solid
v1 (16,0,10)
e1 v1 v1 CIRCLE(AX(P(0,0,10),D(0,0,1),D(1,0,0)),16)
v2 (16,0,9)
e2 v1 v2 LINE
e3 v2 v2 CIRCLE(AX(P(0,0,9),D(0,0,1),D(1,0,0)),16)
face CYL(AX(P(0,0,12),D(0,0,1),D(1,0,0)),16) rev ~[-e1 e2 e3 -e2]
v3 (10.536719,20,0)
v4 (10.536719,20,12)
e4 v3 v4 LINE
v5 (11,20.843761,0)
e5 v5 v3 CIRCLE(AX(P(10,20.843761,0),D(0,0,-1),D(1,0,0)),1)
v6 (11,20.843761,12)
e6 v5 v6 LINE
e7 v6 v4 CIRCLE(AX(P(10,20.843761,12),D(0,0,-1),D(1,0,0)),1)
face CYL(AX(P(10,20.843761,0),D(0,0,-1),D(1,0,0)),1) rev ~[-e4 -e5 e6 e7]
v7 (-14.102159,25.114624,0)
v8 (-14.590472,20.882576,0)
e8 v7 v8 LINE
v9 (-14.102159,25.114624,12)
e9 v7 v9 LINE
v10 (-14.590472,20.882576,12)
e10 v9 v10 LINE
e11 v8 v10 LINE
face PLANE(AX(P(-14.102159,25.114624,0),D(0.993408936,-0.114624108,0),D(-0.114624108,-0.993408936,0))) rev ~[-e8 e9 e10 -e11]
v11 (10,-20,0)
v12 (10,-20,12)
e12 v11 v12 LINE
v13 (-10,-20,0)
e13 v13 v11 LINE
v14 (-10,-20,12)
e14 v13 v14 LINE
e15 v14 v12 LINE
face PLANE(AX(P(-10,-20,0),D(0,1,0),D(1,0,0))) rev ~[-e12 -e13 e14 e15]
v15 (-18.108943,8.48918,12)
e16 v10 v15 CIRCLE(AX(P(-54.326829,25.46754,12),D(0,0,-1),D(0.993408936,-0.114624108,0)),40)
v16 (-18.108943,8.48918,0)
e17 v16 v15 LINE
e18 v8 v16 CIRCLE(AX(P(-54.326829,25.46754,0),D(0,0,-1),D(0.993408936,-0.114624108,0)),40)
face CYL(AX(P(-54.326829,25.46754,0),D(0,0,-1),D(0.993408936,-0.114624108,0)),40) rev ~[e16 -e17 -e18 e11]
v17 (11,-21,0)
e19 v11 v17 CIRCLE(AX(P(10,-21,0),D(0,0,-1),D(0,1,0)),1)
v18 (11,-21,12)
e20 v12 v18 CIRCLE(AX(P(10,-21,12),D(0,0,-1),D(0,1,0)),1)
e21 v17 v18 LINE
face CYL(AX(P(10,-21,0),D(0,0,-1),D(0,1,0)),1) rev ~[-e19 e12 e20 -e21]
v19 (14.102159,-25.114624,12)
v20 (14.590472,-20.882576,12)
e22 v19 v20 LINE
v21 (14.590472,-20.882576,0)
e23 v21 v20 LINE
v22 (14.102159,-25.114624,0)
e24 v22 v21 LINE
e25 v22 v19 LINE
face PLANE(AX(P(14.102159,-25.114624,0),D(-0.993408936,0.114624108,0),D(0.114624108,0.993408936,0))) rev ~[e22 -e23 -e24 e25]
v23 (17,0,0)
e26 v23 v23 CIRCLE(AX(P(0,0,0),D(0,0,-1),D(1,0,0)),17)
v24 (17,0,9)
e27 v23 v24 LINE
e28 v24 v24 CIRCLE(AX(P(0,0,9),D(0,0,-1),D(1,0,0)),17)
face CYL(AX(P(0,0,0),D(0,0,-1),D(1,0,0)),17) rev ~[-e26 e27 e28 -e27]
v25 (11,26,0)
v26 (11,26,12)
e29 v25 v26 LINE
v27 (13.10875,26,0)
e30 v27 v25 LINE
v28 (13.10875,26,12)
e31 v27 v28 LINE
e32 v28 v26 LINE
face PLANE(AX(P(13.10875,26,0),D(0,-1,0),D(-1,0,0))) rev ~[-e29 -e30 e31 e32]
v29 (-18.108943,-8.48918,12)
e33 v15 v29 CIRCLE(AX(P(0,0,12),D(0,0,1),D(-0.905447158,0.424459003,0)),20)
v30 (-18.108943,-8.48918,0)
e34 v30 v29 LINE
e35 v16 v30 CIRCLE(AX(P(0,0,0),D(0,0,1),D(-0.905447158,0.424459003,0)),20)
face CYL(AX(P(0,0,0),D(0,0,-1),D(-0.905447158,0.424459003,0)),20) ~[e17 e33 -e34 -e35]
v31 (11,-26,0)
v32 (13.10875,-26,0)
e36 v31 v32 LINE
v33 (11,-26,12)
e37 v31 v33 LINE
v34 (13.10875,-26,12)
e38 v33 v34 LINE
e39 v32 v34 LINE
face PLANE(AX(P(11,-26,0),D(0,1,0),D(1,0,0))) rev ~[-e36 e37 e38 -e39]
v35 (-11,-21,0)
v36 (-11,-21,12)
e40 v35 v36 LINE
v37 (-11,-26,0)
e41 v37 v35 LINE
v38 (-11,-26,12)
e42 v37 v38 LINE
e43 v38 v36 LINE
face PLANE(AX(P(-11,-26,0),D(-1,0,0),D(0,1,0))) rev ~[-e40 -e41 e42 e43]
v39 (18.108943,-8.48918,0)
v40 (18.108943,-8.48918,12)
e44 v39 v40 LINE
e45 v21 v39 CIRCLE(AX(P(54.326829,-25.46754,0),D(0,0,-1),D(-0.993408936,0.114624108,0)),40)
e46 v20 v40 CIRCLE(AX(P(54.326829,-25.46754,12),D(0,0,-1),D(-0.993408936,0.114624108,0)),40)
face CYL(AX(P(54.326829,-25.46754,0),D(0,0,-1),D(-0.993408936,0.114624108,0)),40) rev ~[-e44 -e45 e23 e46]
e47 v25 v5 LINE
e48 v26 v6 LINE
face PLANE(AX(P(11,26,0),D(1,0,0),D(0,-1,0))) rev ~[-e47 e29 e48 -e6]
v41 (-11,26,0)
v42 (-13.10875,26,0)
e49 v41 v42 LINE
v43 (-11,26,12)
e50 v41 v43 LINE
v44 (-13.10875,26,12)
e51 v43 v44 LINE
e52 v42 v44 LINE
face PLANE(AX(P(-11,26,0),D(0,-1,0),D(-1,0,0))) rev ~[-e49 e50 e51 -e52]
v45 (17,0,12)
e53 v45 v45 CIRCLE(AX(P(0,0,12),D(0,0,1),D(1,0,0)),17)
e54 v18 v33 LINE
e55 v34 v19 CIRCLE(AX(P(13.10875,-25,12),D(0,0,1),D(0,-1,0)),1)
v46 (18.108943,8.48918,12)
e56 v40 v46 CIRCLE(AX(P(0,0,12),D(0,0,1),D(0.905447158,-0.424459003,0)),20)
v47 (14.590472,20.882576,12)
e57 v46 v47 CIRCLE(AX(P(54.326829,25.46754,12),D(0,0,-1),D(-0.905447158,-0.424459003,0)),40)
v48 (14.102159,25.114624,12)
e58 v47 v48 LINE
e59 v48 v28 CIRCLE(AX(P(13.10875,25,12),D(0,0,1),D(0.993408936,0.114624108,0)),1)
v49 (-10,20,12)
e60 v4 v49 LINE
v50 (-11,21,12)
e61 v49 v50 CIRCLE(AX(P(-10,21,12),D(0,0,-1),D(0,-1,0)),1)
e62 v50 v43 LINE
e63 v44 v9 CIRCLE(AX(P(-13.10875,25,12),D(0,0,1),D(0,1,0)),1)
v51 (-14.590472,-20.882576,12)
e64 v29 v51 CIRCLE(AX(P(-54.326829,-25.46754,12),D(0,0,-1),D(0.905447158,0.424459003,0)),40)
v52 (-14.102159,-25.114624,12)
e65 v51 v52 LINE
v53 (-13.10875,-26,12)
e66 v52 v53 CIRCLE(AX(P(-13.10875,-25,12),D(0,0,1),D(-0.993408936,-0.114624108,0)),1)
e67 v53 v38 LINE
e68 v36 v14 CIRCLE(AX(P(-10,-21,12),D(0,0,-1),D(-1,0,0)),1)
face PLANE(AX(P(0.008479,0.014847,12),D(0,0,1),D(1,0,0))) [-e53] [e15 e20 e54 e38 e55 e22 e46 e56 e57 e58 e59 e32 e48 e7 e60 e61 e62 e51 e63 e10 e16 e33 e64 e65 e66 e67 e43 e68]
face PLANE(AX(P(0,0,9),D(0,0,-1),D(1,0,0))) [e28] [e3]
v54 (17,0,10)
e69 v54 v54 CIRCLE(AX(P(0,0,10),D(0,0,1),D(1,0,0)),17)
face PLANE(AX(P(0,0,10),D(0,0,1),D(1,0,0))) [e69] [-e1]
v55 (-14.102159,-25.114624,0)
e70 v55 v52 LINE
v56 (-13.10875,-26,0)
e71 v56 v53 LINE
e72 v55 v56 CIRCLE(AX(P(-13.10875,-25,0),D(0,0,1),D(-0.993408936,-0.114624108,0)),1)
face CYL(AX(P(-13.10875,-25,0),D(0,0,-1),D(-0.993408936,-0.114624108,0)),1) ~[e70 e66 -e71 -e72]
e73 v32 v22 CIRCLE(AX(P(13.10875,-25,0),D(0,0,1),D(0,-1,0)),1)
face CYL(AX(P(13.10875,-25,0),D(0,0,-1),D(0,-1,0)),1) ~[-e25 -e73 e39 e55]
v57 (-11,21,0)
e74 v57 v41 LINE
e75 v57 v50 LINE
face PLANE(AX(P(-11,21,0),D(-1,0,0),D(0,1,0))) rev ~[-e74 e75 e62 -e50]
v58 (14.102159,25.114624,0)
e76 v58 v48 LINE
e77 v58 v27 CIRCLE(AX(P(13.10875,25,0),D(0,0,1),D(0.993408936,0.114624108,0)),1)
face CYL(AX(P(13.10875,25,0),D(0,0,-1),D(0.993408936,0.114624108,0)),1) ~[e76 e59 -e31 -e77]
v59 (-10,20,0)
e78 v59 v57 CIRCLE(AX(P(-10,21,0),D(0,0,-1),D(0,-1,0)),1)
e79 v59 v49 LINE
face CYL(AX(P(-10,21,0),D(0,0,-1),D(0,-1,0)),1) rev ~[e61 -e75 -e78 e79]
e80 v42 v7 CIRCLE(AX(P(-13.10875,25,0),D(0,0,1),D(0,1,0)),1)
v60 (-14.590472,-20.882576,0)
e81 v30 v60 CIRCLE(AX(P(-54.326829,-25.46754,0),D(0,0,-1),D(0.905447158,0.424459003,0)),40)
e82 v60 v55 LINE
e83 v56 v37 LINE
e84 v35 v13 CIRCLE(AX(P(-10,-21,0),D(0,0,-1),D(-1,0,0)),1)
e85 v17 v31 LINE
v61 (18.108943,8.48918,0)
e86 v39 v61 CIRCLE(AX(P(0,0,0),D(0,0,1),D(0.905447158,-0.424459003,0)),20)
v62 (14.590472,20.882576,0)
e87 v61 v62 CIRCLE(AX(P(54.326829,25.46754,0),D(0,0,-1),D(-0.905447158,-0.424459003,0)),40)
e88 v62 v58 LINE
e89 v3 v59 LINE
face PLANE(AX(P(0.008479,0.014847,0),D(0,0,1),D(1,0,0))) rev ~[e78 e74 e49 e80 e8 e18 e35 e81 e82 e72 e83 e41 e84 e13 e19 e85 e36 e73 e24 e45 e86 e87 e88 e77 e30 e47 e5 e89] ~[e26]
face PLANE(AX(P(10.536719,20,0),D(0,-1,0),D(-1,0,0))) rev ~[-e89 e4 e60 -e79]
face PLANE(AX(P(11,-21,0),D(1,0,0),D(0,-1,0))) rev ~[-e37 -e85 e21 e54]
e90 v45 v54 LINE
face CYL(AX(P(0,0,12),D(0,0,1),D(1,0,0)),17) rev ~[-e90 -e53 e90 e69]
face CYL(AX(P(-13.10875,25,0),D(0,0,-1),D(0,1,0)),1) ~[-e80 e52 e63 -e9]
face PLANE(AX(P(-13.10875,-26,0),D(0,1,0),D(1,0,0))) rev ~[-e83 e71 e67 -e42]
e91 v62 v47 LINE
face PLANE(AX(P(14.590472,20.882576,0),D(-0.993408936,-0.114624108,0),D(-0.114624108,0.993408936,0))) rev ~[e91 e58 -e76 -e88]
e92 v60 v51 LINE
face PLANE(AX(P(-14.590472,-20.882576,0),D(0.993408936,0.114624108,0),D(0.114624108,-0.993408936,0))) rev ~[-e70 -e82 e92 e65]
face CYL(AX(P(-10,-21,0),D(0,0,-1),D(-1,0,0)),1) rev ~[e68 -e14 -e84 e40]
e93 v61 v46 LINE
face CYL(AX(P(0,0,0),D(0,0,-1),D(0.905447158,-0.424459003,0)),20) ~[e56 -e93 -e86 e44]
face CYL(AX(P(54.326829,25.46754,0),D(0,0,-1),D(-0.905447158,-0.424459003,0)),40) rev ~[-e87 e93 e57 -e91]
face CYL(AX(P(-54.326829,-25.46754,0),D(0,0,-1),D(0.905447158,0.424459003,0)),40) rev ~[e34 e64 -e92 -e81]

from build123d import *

# Parameters (mm, degrees)
F1_DEPTH = 12
F3_R     = 16
F4_DEPTH = 12.001
F5_R     = 17
F5_R_2   = 16
F6_DEPTH = 2
F2_R     = 17
F7_DEPTH = 9


# Not quite as in the source:
# - the program builds the solid bodies; features that only make, move or delete a surface that nothing else refers to are left out


with BuildPart() as f1:
    # F0 (on Top) → F1 (new body)
    with BuildSketch(Plane.XY):
        with BuildLine():
            Line((10.5367190596, 20), (0, 20))
            Line((0, 20), (-10, 20))
            ThreePointArc((-10, 20), (-10.7071067812, 20.2928932188), (-11, 21))
            Line((-11, 21), (-11, 26))
            Line((-11, 26), (-13.1087498209, 26))
            ThreePointArc((-13.1087498209, 26), (-13.7740978096, 25.7465333576), (-14.1021587568, 25.114624108))
            Line((-14.1021587568, 25.114624108), (-14.5904720191, 20.8825758343))
            ThreePointArc((-14.5904720191, 20.8825758343), (-15.8474732978, 14.5432941931), (-18.1089431513, 8.4891800512))
            ThreePointArc((-18.1089431513, 8.4891800512), (-20, 0), (-18.1089431513, -8.4891800512))
            ThreePointArc((-18.1089431513, -8.4891800512), (-15.8474732978, -14.5432941931), (-14.5904720191, -20.8825758343))
            Line((-14.5904720191, -20.8825758343), (-14.1021587568, -25.114624108))
            ThreePointArc((-14.1021587568, -25.114624108), (-13.7740978096, -25.7465333576), (-13.1087498209, -26))
            Line((-13.1087498209, -26), (-11, -26))
            Line((-11, -26), (-11, -21))
            ThreePointArc((-11, -21), (-10.7071067812, -20.2928932188), (-10, -20))
            Line((-10, -20), (0, -20))
            Line((0, -20), (10, -20))
            ThreePointArc((10, -20), (10.7071067812, -20.2928932188), (11, -21))
            Line((11, -21), (11, -26))
            Line((11, -26), (13.1087498209, -26))
            ThreePointArc((13.1087498209, -26), (13.7740978096, -25.7465333576), (14.1021587568, -25.114624108))
            Line((14.1021587568, -25.114624108), (14.5904720191, -20.8825758343))
            ThreePointArc((14.5904720191, -20.8825758343), (15.8474732978, -14.5432941931), (18.1089431513, -8.4891800512))
            ThreePointArc((18.1089431513, -8.4891800512), (20, 0), (18.1089431513, 8.4891800512))
            ThreePointArc((18.1089431513, 8.4891800512), (15.8474732978, 14.5432941931), (14.5904720191, 20.8825758343))
            Line((14.5904720191, 20.8825758343), (14.1021587568, 25.114624108))
            ThreePointArc((14.1021587568, 25.114624108), (13.7740978096, 25.7465333576), (13.1087498209, 26))
            Line((13.1087498209, 26), (11, 26))
            Line((11, 26), (11, 20.8437610154))
            ThreePointArc((11, 20.8437610154), (10.8765611957, 20.3624705935), (10.5367190596, 20))
        make_face()
    extrude(amount=F1_DEPTH)

    # F3 (on face) → F4 (cut, through all)
    with BuildSketch(Plane.XY.offset(12)):
        Circle(F3_R)
    extrude(amount=-F4_DEPTH, mode=Mode.SUBTRACT)

    # F5 (on face) → F6 (cut)
    with BuildSketch(Plane.XY.offset(12)):
        Circle(F5_R)
        Circle(F5_R_2, mode=Mode.SUBTRACT)
    extrude(amount=-F6_DEPTH, mode=Mode.SUBTRACT)

    # F2 (on face) → F7 (cut)
    with BuildSketch(Plane(origin=(0, 0, 0), x_dir=(1, 0, 0), z_dir=(0, 0, -1))):
        Circle(F2_R)
    extrude(amount=-F7_DEPTH, mode=Mode.SUBTRACT)


solid = f1.part
